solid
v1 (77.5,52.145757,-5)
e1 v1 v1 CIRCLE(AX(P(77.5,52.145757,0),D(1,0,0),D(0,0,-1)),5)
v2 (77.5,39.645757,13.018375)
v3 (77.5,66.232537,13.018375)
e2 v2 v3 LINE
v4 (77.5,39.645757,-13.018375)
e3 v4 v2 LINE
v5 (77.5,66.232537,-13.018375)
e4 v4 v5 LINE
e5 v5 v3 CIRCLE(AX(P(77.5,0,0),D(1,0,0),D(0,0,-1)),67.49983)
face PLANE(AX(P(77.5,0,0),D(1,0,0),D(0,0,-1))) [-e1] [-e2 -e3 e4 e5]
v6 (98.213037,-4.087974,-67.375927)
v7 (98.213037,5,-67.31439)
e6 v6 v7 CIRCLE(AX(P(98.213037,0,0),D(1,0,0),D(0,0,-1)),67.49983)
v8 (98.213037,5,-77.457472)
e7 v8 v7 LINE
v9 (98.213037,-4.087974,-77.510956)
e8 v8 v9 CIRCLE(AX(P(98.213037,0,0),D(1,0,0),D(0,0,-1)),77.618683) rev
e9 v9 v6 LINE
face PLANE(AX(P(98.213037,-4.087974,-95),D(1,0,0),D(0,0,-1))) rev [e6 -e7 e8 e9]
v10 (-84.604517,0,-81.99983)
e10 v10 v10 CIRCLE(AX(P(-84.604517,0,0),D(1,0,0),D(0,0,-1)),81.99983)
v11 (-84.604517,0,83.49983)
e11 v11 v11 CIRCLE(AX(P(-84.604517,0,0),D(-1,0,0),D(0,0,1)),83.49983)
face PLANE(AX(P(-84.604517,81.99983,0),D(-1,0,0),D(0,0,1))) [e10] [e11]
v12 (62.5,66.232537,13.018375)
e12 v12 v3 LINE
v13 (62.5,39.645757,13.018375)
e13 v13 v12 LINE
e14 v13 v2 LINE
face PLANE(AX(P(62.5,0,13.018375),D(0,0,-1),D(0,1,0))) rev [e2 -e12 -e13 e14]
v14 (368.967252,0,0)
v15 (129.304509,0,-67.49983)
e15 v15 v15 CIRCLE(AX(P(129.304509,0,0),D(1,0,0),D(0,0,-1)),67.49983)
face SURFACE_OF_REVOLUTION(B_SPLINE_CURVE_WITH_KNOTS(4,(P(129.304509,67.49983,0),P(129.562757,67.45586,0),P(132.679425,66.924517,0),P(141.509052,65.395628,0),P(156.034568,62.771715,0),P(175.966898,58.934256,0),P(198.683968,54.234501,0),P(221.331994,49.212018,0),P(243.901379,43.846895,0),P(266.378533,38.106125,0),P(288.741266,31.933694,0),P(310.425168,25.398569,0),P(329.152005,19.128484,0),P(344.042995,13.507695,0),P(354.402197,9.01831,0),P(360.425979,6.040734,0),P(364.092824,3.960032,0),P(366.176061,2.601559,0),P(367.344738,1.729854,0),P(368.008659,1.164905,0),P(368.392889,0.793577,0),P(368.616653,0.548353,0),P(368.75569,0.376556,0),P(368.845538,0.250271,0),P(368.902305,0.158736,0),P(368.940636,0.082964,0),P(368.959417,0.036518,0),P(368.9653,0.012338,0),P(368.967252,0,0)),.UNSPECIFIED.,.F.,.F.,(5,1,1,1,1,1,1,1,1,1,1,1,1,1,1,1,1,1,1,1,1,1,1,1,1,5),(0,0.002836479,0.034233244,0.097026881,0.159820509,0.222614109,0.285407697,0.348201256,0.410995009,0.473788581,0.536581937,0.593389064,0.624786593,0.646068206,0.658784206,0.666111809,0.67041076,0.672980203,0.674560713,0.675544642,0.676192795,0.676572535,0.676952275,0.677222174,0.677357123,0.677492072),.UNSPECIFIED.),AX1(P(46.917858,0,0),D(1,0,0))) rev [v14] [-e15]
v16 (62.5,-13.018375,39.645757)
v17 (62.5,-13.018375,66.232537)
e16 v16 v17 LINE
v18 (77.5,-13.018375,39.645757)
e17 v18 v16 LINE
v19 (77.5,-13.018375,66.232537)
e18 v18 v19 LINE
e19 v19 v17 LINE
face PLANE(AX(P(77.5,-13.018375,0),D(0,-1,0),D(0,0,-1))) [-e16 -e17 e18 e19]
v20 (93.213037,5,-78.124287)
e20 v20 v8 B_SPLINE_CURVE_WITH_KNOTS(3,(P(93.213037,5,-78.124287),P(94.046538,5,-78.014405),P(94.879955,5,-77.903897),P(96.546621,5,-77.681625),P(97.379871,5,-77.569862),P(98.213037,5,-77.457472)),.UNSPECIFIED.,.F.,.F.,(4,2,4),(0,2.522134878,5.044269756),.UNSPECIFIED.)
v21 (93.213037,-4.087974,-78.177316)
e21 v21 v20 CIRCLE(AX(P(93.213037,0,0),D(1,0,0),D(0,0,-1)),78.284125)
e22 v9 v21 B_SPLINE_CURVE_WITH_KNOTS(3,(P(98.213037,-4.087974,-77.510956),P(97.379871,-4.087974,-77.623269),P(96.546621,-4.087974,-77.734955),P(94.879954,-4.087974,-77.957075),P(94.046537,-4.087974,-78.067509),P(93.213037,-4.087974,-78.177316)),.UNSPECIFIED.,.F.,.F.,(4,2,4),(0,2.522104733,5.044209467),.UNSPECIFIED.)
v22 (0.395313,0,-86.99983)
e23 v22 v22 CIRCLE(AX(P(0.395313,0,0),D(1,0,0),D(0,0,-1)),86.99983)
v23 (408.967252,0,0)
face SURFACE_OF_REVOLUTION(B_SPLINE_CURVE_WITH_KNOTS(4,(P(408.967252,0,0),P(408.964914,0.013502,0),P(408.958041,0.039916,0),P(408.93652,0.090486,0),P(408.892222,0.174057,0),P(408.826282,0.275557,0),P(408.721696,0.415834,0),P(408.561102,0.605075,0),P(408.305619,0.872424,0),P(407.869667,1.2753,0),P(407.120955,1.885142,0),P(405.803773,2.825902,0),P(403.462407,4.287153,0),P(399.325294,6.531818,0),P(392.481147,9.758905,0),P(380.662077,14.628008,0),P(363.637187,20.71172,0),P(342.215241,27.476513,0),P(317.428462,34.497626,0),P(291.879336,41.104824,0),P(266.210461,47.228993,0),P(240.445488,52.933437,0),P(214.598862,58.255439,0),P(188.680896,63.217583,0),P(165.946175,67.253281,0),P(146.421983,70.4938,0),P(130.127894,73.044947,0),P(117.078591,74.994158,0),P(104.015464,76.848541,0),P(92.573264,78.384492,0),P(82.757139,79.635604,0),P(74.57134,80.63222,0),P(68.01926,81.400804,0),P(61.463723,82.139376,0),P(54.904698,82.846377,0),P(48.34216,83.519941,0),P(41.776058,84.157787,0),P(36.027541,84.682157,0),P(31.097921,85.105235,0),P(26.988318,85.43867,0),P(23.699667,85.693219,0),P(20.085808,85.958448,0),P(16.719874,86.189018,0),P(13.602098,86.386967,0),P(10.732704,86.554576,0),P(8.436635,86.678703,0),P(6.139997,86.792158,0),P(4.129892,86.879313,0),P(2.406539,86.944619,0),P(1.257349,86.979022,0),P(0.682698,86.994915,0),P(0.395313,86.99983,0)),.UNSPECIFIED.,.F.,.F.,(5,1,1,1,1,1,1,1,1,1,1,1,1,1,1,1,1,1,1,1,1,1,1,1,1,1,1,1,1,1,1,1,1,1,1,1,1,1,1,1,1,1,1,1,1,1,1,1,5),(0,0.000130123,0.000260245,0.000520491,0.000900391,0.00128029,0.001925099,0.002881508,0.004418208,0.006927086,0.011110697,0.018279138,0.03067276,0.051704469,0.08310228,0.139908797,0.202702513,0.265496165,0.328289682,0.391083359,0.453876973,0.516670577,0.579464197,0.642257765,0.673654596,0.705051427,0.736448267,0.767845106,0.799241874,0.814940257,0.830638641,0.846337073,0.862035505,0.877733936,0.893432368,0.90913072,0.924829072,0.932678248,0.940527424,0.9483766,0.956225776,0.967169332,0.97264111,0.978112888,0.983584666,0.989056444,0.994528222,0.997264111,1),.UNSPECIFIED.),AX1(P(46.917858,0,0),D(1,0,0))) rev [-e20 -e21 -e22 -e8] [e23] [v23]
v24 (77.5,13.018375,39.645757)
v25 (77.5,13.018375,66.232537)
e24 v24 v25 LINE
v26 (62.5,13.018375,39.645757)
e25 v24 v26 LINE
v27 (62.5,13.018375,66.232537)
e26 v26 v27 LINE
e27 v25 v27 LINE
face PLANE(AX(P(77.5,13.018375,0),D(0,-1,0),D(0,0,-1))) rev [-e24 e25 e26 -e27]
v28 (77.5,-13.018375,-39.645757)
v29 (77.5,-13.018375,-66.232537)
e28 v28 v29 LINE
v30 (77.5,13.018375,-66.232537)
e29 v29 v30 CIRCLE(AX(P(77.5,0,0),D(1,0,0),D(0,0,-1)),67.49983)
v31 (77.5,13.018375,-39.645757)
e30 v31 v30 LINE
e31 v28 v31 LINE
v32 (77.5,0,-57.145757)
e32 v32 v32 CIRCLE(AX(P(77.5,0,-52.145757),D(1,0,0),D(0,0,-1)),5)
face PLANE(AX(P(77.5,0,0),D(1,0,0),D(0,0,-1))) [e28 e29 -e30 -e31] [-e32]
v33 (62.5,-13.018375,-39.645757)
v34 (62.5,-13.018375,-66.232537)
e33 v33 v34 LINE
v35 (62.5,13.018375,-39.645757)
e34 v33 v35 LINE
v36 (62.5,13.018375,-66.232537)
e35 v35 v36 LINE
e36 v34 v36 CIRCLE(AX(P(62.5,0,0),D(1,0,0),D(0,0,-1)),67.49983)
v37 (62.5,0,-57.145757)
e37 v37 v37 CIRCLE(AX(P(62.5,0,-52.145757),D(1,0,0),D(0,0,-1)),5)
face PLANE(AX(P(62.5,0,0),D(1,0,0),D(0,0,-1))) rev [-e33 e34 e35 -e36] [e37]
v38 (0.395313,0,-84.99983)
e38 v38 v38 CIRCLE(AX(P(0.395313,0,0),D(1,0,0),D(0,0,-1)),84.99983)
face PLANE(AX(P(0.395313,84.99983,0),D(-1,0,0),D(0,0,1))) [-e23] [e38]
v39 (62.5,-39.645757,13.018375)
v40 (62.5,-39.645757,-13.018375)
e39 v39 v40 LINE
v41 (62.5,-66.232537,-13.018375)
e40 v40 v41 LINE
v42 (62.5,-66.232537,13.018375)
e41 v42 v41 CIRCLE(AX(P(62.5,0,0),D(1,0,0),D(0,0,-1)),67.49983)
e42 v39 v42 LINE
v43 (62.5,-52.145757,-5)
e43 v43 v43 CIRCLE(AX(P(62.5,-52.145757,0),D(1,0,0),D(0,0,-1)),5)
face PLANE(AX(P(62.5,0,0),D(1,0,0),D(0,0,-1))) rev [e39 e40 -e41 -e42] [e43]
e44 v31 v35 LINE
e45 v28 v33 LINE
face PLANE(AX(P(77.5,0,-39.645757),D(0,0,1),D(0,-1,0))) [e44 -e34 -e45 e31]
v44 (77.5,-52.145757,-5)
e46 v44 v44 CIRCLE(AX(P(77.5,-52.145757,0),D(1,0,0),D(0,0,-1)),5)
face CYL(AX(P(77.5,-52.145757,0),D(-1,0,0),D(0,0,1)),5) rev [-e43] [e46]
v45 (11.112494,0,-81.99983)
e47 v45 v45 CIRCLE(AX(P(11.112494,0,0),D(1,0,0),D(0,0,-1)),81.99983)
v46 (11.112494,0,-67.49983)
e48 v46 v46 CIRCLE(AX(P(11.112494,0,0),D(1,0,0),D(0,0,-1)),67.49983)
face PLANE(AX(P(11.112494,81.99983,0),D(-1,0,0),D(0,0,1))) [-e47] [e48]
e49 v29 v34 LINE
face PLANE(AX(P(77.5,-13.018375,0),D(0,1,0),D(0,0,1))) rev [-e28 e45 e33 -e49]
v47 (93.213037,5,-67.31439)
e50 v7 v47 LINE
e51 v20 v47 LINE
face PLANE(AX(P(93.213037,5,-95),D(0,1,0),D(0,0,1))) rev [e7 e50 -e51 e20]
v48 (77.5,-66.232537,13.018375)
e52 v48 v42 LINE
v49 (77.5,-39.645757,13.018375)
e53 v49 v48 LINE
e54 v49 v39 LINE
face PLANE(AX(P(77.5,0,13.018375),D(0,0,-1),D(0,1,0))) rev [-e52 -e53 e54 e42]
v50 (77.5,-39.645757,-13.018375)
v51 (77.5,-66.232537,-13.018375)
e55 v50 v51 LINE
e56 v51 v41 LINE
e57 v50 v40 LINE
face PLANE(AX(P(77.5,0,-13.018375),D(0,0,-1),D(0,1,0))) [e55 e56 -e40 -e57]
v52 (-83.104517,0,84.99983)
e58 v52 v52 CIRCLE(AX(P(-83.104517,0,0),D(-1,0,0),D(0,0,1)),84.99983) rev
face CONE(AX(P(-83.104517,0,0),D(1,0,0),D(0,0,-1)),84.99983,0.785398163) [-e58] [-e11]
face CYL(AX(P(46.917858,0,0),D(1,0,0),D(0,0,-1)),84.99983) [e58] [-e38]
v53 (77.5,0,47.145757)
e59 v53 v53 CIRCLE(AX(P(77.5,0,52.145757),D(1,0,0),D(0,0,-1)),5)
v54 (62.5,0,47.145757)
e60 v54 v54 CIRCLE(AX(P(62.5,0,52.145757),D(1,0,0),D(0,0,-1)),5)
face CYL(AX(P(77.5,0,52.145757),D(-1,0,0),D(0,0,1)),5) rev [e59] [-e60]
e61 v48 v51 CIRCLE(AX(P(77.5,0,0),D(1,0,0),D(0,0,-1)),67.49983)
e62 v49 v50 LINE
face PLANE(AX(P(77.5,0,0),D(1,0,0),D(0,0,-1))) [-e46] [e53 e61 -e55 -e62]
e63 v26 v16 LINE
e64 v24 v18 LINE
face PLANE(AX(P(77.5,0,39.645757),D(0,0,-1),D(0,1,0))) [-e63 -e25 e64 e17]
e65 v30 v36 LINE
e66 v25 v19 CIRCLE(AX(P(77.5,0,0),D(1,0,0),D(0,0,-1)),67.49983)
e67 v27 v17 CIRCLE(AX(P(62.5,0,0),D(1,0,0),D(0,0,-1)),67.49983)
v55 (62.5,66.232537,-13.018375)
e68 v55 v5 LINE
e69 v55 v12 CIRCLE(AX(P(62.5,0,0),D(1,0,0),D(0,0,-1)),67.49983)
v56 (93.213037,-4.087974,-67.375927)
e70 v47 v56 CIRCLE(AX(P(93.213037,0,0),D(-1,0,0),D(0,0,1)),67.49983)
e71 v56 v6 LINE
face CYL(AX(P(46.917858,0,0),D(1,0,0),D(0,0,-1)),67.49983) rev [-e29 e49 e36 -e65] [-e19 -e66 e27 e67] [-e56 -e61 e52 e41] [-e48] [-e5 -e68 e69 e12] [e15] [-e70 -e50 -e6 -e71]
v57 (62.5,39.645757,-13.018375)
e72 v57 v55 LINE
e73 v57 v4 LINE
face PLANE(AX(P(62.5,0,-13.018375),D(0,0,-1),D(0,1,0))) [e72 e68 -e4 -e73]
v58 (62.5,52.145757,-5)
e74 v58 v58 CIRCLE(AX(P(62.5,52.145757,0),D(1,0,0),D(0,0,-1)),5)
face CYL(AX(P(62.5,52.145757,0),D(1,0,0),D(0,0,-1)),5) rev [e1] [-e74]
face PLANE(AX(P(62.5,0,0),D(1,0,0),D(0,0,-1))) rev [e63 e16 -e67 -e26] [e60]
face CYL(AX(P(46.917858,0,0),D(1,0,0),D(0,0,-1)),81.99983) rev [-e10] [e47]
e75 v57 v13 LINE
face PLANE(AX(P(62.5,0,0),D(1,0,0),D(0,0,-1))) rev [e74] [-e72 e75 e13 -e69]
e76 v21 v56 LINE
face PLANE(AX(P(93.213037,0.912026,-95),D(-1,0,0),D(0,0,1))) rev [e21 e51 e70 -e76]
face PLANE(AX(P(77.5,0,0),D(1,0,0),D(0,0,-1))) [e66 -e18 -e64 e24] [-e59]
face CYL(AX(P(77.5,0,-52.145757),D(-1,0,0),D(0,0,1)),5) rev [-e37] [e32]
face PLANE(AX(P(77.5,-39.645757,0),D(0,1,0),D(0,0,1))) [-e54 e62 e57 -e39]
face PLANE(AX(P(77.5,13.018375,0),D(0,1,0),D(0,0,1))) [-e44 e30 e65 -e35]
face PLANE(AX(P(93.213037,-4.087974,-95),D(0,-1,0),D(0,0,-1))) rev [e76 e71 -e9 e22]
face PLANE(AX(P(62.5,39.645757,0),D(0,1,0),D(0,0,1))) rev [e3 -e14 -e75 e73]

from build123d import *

# Parameters (mm, degrees)
CHAMFER1_SIZE            = 1.5
BOSS_EXTRUDE6_DEPTH      = 7.5
BOSS_EXTRUDE6_DEPTH_BACK = 7.5
SKETCH11_R               = 5
CUT_EXTRUDE1_DEPTH       = 95


with BuildPart() as part:
    # Sketch10 → Revolve1 (revolve)
    with BuildSketch(Plane.XY):
        with BuildLine():
            Line((11.112493743, 81.99983), (11.112493743, 67.49983))
            Line((11.112493743, 67.49983), (129.304508698, 67.49983))
            add(Edge.make_bspline(
                [(368.967251823, 0), (368.965299543, 0.012338489), (368.959416882, 0.036518378), (368.940636147, 0.082964007), (368.902304552, 0.158736421), (368.845538097, 0.250270687), (368.755690124, 0.376555746), (368.616653262, 0.54835284), (368.392888737, 0.793577299), (368.008659121, 1.164904965), (367.344738263, 1.729853685), (366.176060796, 2.601559154), (364.09282389, 3.960032328), (360.425978756, 6.040734396), (354.402196649, 9.01831007), (344.042994901, 13.507695011), (329.152005398, 19.128483965), (310.425167902, 25.398569259), (288.741266406, 31.933693508), (266.378532845, 38.106125474), (243.901379123, 43.846895186), (221.331994001, 49.212017941), (198.683967629, 54.234500927), (175.966897581, 58.934255644), (156.034567874, 62.771715365), (141.509051931, 65.395628269), (132.679425236, 66.924517444), (129.562757302, 67.455859883), (129.304508698, 67.49983)],
                knots=[0, 0, 0, 0, 0, 0.000134949, 0.000269899, 0.000539798, 0.000919537, 0.001299277, 0.001947431, 0.00293136, 0.004511869, 0.007081312, 0.011380263, 0.018707867, 0.031423867, 0.052705479, 0.084103008, 0.140910136, 0.203703492, 0.266497064, 0.329290816, 0.392084375, 0.454877964, 0.517671564, 0.580465191, 0.643258828, 0.674655593, 0.677492072, 0.677492072, 0.677492072, 0.677492072, 0.677492072], degree=4))
            Line((368.967251823, 0), (408.967251823, 0))
            add(Edge.make_bspline(
                [(408.967251823, 0), (408.964913524, 0.013501739), (408.958040758, 0.039916077), (408.936520441, 0.090485698), (408.892222076, 0.174057132), (408.826281575, 0.275556803), (408.721696416, 0.415833756), (408.561101809, 0.605075245), (408.30561918, 0.87242415), (407.86966713, 1.275299562), (407.120955138, 1.885142115), (405.803773451, 2.82590185), (403.46240692, 4.287152794), (399.325294488, 6.531818454), (392.481146888, 9.758904649), (380.662076725, 14.628008466), (363.637187185, 20.711720382), (342.215241093, 27.476512989), (317.428462321, 34.49762647), (291.879335737, 41.10482439), (266.21046092, 47.228993169), (240.44548836, 52.933436777), (214.598861982, 58.255439009), (188.68089566, 63.217582693), (165.946174917, 67.253280679), (146.421982586, 70.493799722), (130.127893898, 73.044947468), (117.078590637, 74.994157933), (104.015464216, 76.84854079), (92.573263959, 78.384492045), (82.757139441, 79.635603973), (74.571340184, 80.632219902), (68.019260454, 81.400804211), (61.463723364, 82.139375899), (54.90469802, 82.84637726), (48.342159918, 83.519940506), (41.776057559, 84.15778717), (36.02754108, 84.682157239), (31.097921259, 85.105234912), (26.988317923, 85.438669825), (23.699666618, 85.693218594), (20.085807822, 85.958448038), (16.719873821, 86.189018485), (13.602098287, 86.386966779), (10.732704013, 86.554575744), (8.436635008, 86.678703291), (6.139997341, 86.792157585), (4.129892063, 86.879313264), (2.40653858, 86.944618982), (1.257348635, 86.979022496), (0.68269791, 86.99491462), (0.395312527, 86.99983)],
                knots=[0, 0, 0, 0, 0, 0.000130123, 0.000260245, 0.000520491, 0.000900391, 0.00128029, 0.001925099, 0.002881508, 0.004418208, 0.006927086, 0.011110697, 0.018279138, 0.03067276, 0.051704469, 0.08310228, 0.139908797, 0.202702513, 0.265496165, 0.328289682, 0.391083359, 0.453876973, 0.516670577, 0.579464197, 0.642257765, 0.673654596, 0.705051427, 0.736448267, 0.767845106, 0.799241874, 0.814940257, 0.830638641, 0.846337073, 0.862035505, 0.877733936, 0.893432368, 0.90913072, 0.924829072, 0.932678248, 0.940527424, 0.9483766, 0.956225776, 0.967169332, 0.97264111, 0.978112888, 0.983584666, 0.989056444, 0.994528222, 0.997264111, 1, 1, 1, 1, 1], degree=4))
            Line((0.395312527, 86.99983), (0.395312527, 84.99983))
            Line((0.395312527, 84.99983), (-84.604517473, 84.99983))
            Line((-84.604517473, 84.99983), (-84.604517473, 81.99983))
            Line((-84.604517473, 81.99983), (11.112493743, 81.99983))
        make_face()
    revolve(axis=Axis((46.917858469, 0, 0), (-1, 0, 0)))

    # Chamfer1
    chamfer1_edges = [part.edges().sort_by_distance(p)[0] for p in [
        (-84.604517473, -84.99983, 0),
    ]]
    chamfer(chamfer1_edges, length=CHAMFER1_SIZE)

    # Sketch11 → Boss-Extrude6 (add, two sides: drawn at the far end of the back side and taken through both)
    # profile 1 of 4: a face of its own
    with BuildSketch(Plane(origin=(70, 0, 0), x_dir=(0, 0, -1), z_dir=(1, 0, 0)).offset(-BOSS_EXTRUDE6_DEPTH_BACK)):
        with BuildLine():
            Line((39.645757239, 13.018375058), (39.645757239, -13.018375058))
            Line((39.645757239, -13.018375058), (66.232710279, -13.018375058))
            ThreePointArc((66.232710279, -13.018375058), (67.5, 0), (66.232710279, 13.018375058))
            Line((66.232710279, 13.018375058), (39.645757239, 13.018375058))
        make_face()
        with Locations((52.145757239, 0)):
            Circle(SKETCH11_R, mode=Mode.SUBTRACT)
    # profile 2 of 4: a face of its own
    with BuildSketch(Plane(origin=(70, 0, 0), x_dir=(0, 0, -1), z_dir=(1, 0, 0)).offset(-BOSS_EXTRUDE6_DEPTH_BACK)):
        with BuildLine():
            ThreePointArc((-13.018375058, -66.232710279), (0, -67.5), (13.018375058, -66.232710279))
            Line((13.018375058, -66.232710279), (13.018375058, -39.645757239))
            Line((13.018375058, -39.645757239), (-13.018375058, -39.645757239))
            Line((-13.018375058, -39.645757239), (-13.018375058, -66.232710279))
        make_face()
        with Locations((0, -52.145757239)):
            Circle(SKETCH11_R, mode=Mode.SUBTRACT)
    # profile 3 of 4: a face of its own
    with BuildSketch(Plane(origin=(70, 0, 0), x_dir=(0, 0, -1), z_dir=(1, 0, 0)).offset(-BOSS_EXTRUDE6_DEPTH_BACK)):
        with BuildLine():
            Line((13.018375058, 39.645757239), (13.018375058, 66.232710279))
            ThreePointArc((13.018375058, 66.232710279), (0, 67.5), (-13.018375058, 66.232710279))
            Line((-13.018375058, 66.232710279), (-13.018375058, 39.645757239))
            Line((-13.018375058, 39.645757239), (13.018375058, 39.645757239))
        make_face()
        with Locations((0, 52.145757239)):
            Circle(SKETCH11_R, mode=Mode.SUBTRACT)
    # profile 4 of 4: a face of its own
    with BuildSketch(Plane(origin=(70, 0, 0), x_dir=(0, 0, -1), z_dir=(1, 0, 0)).offset(-BOSS_EXTRUDE6_DEPTH_BACK)):
        with BuildLine():
            ThreePointArc((-66.232710279, 13.018375058), (-67.5, 0), (-66.232710279, -13.018375058))
            Line((-66.232710279, -13.018375058), (-39.645757239, -13.018375058))
            Line((-39.645757239, -13.018375058), (-39.645757239, 13.018375058))
            Line((-39.645757239, 13.018375058), (-66.232710279, 13.018375058))
        make_face()
        with Locations((-52.145757239, 0)):
            Circle(SKETCH11_R, mode=Mode.SUBTRACT)
    extrude(amount=BOSS_EXTRUDE6_DEPTH + BOSS_EXTRUDE6_DEPTH_BACK)

    # Sketch16 → Cut-Extrude1 (cut)
    with BuildSketch(Plane.XY):
        Polygon((93.213036915, 0.912025948), (93.213036915, 5), (98.213036915, 5), (98.213036915, -4.087974052), (93.213036915, -4.087974052), align=None)
    extrude(amount=-CUT_EXTRUDE1_DEPTH, mode=Mode.SUBTRACT)


solid = part.part
